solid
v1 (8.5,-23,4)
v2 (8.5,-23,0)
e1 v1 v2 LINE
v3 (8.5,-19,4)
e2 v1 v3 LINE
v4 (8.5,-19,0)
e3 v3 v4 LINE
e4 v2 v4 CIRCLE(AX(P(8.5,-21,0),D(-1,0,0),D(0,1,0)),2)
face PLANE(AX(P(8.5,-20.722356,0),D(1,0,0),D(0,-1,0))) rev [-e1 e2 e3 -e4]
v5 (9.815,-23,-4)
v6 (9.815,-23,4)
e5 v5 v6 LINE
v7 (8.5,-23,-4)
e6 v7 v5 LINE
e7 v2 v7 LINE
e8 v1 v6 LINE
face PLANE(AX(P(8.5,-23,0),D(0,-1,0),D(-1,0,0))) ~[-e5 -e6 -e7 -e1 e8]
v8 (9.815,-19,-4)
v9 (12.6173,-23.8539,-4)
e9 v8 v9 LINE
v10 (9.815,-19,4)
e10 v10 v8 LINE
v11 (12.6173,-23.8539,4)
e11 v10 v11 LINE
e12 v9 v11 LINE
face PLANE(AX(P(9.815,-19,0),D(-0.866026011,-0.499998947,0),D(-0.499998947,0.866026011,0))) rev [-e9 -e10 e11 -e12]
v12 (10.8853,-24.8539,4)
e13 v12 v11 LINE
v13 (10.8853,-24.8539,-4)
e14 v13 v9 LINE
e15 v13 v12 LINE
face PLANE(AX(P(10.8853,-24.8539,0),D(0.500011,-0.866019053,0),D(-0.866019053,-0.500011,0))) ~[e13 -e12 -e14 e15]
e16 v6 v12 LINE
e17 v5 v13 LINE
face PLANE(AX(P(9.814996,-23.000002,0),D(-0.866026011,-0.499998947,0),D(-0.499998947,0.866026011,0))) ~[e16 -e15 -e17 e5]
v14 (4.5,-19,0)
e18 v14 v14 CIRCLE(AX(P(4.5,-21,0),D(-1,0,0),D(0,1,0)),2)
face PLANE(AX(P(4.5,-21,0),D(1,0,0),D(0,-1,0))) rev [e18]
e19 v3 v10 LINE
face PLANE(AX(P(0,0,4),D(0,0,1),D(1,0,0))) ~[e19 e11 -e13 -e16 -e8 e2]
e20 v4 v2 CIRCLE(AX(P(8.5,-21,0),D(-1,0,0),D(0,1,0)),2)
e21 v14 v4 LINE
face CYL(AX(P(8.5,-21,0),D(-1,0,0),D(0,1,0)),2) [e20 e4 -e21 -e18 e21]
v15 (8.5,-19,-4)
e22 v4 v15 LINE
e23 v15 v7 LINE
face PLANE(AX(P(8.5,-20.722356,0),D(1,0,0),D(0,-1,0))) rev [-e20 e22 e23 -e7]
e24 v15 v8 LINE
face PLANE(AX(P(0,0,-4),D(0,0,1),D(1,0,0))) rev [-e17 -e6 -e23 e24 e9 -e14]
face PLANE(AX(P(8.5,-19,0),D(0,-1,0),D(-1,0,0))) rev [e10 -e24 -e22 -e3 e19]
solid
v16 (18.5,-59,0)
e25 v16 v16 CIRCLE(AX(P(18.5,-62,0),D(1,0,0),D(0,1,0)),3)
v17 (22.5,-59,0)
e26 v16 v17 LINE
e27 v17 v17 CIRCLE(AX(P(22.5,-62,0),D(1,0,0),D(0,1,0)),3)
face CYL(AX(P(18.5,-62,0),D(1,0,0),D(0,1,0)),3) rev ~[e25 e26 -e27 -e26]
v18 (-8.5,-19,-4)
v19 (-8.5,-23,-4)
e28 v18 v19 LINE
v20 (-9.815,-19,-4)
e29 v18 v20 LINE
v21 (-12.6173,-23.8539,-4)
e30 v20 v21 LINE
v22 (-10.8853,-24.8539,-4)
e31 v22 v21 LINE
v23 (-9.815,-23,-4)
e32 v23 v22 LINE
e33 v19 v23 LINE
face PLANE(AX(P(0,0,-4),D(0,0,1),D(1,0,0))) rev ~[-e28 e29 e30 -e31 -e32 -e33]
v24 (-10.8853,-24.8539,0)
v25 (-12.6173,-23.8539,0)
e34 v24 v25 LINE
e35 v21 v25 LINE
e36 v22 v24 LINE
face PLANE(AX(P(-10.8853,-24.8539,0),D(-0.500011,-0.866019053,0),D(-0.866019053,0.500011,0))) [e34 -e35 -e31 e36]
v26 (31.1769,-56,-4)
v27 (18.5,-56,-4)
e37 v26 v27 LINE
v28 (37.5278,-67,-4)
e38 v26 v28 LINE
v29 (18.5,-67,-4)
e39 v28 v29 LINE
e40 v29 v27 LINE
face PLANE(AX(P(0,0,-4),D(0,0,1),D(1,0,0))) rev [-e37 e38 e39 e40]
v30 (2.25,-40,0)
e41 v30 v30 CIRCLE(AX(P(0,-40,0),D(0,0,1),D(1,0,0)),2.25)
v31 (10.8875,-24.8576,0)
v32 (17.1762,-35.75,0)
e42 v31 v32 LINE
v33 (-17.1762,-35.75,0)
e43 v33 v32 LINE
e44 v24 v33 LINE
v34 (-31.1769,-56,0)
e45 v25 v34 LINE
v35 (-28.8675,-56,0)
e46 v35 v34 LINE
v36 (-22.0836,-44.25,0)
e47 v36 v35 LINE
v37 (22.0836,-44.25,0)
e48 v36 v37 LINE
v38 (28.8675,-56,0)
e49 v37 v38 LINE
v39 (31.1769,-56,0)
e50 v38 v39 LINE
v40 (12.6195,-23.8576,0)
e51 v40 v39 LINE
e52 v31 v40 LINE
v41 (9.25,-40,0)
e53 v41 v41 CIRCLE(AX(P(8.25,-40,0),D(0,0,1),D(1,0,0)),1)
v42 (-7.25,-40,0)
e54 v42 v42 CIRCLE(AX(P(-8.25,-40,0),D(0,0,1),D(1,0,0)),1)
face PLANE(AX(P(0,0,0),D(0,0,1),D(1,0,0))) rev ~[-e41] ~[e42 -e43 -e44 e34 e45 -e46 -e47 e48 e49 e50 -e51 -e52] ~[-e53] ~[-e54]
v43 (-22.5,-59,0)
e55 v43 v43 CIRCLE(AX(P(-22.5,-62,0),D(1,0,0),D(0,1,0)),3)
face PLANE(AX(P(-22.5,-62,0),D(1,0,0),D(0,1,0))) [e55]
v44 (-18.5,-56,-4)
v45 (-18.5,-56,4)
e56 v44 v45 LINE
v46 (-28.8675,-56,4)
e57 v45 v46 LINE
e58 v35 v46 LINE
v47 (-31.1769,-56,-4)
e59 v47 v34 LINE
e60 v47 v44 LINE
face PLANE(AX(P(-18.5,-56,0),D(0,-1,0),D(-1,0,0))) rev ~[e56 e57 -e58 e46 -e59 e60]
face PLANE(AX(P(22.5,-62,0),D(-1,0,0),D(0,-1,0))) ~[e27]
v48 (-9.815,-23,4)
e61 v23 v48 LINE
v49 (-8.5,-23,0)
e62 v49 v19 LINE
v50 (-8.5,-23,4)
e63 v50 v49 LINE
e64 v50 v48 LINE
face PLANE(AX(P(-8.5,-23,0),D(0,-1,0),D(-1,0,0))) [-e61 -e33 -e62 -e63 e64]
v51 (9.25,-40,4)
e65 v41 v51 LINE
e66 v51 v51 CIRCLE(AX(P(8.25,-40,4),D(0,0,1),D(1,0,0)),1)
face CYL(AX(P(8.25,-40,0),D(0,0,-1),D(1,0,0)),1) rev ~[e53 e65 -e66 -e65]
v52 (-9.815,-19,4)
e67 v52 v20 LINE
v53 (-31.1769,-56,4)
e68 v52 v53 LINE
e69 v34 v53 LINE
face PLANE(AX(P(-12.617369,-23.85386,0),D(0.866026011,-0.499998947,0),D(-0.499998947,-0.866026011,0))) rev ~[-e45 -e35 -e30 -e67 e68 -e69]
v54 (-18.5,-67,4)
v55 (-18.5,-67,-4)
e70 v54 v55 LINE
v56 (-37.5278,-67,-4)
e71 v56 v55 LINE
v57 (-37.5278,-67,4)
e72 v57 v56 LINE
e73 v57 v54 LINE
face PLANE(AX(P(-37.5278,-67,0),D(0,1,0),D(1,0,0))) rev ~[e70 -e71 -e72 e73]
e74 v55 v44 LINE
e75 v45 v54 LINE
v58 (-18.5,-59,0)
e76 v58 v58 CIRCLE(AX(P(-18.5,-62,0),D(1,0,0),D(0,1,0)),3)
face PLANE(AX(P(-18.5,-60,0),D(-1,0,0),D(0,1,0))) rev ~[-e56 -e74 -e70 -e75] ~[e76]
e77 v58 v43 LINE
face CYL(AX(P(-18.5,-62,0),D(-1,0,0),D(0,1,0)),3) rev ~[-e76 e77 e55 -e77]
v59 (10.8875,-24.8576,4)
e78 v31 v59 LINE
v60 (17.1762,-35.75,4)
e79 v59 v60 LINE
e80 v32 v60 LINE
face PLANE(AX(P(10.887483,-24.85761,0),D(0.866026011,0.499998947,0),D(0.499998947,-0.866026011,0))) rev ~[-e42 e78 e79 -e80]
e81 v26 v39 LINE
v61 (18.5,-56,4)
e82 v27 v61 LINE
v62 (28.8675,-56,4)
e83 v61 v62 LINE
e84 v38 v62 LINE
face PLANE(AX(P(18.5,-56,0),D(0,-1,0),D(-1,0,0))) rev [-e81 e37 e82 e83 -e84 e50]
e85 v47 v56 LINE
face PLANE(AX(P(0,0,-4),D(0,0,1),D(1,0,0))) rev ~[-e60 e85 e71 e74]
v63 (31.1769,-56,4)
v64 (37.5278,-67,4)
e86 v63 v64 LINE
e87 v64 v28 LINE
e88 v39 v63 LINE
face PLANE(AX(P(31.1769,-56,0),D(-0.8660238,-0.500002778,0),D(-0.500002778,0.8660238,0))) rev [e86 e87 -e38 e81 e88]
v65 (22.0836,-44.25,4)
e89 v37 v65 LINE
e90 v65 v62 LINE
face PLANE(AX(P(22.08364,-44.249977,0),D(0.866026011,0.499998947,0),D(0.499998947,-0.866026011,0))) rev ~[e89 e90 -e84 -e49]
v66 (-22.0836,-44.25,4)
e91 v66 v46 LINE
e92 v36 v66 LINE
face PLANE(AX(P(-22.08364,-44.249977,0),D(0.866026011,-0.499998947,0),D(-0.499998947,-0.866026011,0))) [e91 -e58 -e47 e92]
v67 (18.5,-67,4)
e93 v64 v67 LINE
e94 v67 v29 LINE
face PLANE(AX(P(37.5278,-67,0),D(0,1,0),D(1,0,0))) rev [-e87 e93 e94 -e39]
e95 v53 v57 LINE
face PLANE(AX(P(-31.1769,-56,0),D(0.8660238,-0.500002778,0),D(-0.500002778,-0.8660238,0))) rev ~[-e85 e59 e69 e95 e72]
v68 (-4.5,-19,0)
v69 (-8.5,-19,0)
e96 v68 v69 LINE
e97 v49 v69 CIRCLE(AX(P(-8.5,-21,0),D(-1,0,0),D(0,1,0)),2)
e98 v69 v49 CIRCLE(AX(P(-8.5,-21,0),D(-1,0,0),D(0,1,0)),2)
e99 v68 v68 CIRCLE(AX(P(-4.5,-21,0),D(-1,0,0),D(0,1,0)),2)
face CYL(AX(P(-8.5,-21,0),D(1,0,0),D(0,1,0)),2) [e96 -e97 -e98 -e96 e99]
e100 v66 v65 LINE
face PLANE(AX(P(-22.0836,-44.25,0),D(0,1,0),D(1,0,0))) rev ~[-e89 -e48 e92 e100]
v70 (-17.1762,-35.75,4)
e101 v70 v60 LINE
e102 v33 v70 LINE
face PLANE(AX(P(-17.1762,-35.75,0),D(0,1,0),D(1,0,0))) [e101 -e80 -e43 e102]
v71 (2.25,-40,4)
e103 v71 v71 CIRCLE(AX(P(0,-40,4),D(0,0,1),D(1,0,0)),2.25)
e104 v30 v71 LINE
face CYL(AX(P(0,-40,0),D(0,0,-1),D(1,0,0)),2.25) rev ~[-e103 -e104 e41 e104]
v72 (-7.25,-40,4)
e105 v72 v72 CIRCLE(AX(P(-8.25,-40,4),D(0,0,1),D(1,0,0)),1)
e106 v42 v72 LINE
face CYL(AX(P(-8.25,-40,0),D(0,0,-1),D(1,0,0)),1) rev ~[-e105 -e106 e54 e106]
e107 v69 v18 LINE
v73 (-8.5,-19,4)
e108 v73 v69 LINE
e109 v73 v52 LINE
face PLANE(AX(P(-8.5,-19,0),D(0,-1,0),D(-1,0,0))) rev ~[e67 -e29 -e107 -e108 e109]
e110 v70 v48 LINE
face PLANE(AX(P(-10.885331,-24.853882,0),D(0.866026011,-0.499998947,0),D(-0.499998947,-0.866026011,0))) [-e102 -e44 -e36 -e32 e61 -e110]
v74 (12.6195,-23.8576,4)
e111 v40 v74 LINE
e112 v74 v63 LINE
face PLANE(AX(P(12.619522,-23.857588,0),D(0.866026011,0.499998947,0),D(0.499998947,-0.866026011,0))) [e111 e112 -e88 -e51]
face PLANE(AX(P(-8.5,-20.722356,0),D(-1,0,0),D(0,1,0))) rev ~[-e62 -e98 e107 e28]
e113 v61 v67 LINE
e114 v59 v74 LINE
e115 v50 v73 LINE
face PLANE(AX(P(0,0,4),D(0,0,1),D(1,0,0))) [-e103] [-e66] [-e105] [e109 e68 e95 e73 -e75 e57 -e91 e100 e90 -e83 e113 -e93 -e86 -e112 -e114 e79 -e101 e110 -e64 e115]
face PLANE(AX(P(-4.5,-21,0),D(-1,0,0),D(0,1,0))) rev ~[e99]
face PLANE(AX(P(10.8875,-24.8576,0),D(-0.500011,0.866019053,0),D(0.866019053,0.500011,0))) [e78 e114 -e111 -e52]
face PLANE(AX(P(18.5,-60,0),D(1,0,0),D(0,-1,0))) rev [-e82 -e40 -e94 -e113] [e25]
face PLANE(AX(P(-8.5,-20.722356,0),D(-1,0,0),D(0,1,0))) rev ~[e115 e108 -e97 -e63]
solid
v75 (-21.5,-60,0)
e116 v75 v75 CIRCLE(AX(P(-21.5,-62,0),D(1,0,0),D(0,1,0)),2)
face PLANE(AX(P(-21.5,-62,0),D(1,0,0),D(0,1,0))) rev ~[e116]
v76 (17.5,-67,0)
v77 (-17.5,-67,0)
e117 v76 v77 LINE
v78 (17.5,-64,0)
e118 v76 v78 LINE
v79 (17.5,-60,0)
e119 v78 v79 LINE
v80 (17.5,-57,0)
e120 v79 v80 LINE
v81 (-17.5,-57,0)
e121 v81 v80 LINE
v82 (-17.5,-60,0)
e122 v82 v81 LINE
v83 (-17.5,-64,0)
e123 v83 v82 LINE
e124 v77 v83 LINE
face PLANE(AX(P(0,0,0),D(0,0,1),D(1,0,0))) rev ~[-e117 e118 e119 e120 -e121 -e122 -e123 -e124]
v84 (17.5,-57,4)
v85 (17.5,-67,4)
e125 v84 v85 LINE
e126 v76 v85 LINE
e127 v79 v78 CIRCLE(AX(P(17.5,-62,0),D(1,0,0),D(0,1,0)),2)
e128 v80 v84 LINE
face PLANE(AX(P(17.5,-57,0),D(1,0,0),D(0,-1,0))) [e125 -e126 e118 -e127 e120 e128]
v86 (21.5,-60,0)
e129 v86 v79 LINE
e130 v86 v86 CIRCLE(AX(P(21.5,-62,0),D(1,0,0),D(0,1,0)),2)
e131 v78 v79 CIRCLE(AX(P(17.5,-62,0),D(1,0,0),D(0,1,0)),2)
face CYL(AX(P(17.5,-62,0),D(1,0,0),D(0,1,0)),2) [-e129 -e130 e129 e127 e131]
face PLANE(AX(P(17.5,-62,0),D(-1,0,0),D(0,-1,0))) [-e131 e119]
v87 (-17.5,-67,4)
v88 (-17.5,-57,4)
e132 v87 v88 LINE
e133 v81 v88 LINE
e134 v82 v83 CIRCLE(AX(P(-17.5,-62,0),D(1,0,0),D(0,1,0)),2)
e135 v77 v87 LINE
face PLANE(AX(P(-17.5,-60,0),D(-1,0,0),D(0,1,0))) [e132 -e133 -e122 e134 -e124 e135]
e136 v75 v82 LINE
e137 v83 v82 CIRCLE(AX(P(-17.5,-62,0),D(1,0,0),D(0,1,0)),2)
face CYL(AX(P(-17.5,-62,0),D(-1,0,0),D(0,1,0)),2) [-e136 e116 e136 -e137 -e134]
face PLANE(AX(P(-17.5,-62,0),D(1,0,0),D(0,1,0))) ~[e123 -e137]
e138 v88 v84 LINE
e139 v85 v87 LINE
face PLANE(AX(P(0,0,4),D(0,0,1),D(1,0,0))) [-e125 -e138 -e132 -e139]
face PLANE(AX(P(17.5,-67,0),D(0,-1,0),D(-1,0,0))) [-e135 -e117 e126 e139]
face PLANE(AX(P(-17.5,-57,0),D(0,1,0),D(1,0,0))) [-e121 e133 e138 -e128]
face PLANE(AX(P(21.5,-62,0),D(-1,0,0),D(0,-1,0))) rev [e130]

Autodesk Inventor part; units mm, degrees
ref_plane "YZ Plane" through (0, 0, 0) normal (1, 0, 0) x (0, 1, 0)
ref_plane "XZ Plane" through (0, 0, 0) normal (0, 1, 0) x (-1, 0, 0)
ref_plane "XY Plane" through (0, 0, 0) normal (0, 0, 1) x (1, 0, 0)
sketch "Sketch1" plane through (0, 0, 0) normal (0, 0, 1) x (1, 0, 0)
  circle A0 centre (0, 0) radius 7.5
  line L0 (-21.2869, 0) -> (22.3896, 0) construction
  line L1 (0, 21.9302) -> (0, -69.0741) construction
  circle A1 centre (0, 11.75) radius 2.25
  circle A2 centre (-11.75, 0) radius 2.25
  circle A3 centre (0, -11.75) radius 2.25
  circle A4 centre (11.75, 0) radius 2.25
  line L2 (24.9778, -67) -> (-24.9778, -67) construction
  line L3 (-17.5, -57) -> (17.5, -57)
  line L4 (17.5, -57) -> (17.5, -67)
  line L5 (17.5, -67) -> (-17.5, -67)
  line L6 (-17.5, -67) -> (-17.5, -57)
  line L7 (-37.5278, -67) -> (-18.5, -67)
  line L8 (-18.5, -67) -> (-18.5, -56)
  line L9 (-17.5, -62) -> (17.5, -62) construction
  line L10 (-18.5, -59) -> (-22.5, -59)
  line L11 (-22.5, -59) -> (-22.5, -65)
  line L12 (-22.5, -65) -> (-18.5, -65)
  line L13 (-18.5, -65) -> (-18.5, -59)
  line L14 (-17.5, -60) -> (-21.5, -60)
  line L15 (-21.5, -60) -> (-21.5, -64)
  line L16 (-21.5, -64) -> (-17.5, -64)
  line L17 (-17.5, -64) -> (-17.5, -60)
  line L18 (-18.5, -56) -> (-28.8675, -56)
  line L19 (17.5, -60) -> (21.5, -60)
  line L20 (21.5, -60) -> (21.5, -64)
  line L21 (21.5, -64) -> (17.5, -64)
  line L22 (17.5, -64) -> (17.5, -60)
  line L23 (18.5, -67) -> (18.5, -56)
  line L24 (18.5, -67) -> (37.5278, -67)
  line L25 (18.5, -65) -> (22.5, -65)
  line L26 (22.5, -65) -> (22.5, -59)
  line L27 (22.5, -59) -> (18.5, -59)
  line L28 (18.5, -59) -> (18.5, -65)
  line L29 (18.5, -56) -> (28.8675, -56)
  line L30 (-23.7704, -40) -> (28.6931, -40) construction
  line L31 (-17.1762, -35.75) -> (17.1762, -35.75)
  line L32 (-22.0836, -44.25) -> (22.0836, -44.25)
  circle A5 centre (0, -40) radius 2.25
  line L33 (-7.5, -16) -> (7.5, -16)
  line L34 (7.5, -16) -> (7.5, -21)
  line L35 (7.5, -26) -> (-7.5, -26)
  line L36 (-7.5, -26) -> (-7.5, -24)
  line L37 (7.5, -21) -> (-7.5, -21) construction
  line L38 (-7.5, -18) -> (-3.5, -18)
  line L39 (-3.5, -18) -> (-3.5, -21)
  line L40 (-3.5, -24) -> (-7.5, -24)
  line L41 (-7.5, -24) -> (-7.5, -23)
  line L42 (-8.5, -19) -> (-4.5, -19)
  line L43 (-4.5, -19) -> (-4.5, -23)
  line L44 (-4.5, -23) -> (-8.5, -23)
  line L45 (-8.5, -23) -> (-8.5, -19)
  line L46 (7.5, -18) -> (3.5, -18)
  line L47 (3.5, -18) -> (3.5, -21)
  line L48 (3.5, -24) -> (7.5, -24)
  line L49 (7.5, -24) -> (7.5, -18)
  line L50 (8.5, -19) -> (4.5, -19)
  line L51 (4.5, -19) -> (4.5, -23)
  line L52 (4.5, -23) -> (8.5, -23)
  line L53 (8.5, -23) -> (8.5, -19)
  line L54 (-9.815, -19) -> (-31.1769, -56)
  line L55 (-7.5056, -19) -> (-28.8675, -56)
  line L56 (7.5056, -19) -> (28.8675, -56)
  line L57 (-4.5, -21) -> (-8.5, -21)
  line L58 (4.5, -21) -> (8.5, -21)
  line L59 (-21.5, -62) -> (-17.5, -62)
  line L60 (17.5, -62) -> (21.5, -62)
  line L61 (-22.5, -62) -> (-18.5, -62)
  line L62 (22.5, -62) -> (18.5, -62)
  line L63 (-7.5, -21) -> (-3.5, -21)
  line L64 (3.5, -21) -> (7.5, -21)
  line L65 (-28.8675, -56) -> (-31.1769, -56)
  line L66 (28.8675, -56) -> (31.1769, -56)
  line L67 (-10.8853, -24.8539) -> (-12.6173, -23.8539)
  line L68 (10.8875, -24.8576) -> (12.6195, -23.8576)
  line L69 (7.5, -23) -> (7.5, -24)
  line L70 (-7.5, -23) -> (-7.5, -21)
  line L71 (-7.5, -24) -> (-7.5, -16)
  line L72 (7.5, -24) -> (7.5, -26)
  line L73 (-7.5, -21) -> (-7.5, -18)
  line L74 (-3.5, -21) -> (-3.5, -24)
  line L75 (3.5, -21) -> (3.5, -24)
  line L76 (7.5, -21) -> (7.5, -23)
  line L77 (-18.4752, 0) -> (-9.2376, 16)
  line L78 (-9.2376, 16) -> (9.2376, 16)
  line L79 (9.2376, 16) -> (18.4752, 0)
  line L80 (18.4752, 0) -> (9.2376, -16)
  line L81 (9.2376, -16) -> (-9.2376, -16)
  line L82 (-9.2376, -16) -> (-18.4752, 0)
  line L83 (-77.3649, 0) -> (-38.6825, 67) construction
  line L84 (-38.6825, 67) -> (38.6825, 67) construction
  line L85 (38.6825, 67) -> (77.3649, 0) construction
  line L86 (77.3649, 0) -> (38.6825, -67) construction
  line L87 (38.6825, -67) -> (-38.6825, -67) construction
  line L88 (-38.6825, -67) -> (-77.3649, 0) construction
  line L89 (-9.2376, -16) -> (-38.6825, -67) construction
  line L90 (9.2376, -16) -> (38.6825, -67) construction
  line L91 (0, -16.7974) -> (0, -26) construction
  line L92 (9.815, -19) -> (31.1769, -56)
  line L93 (-8.5, -19) -> (-9.815, -19)
  line L94 (8.5, -19) -> (9.815, -19)
  line L95 (-8.5, -23) -> (-9.815, -23)
  line L96 (8.5, -23) -> (9.815, -23)
  line L97 (-31.1769, -56) -> (-37.5278, -67)
  line L98 (31.1769, -56) -> (37.5278, -67)
  circle A6 centre (-8.25, -40) radius 1
  circle A7 centre (8.25, -40) radius 1
  point P0 (0, -57)
  point P1 (0, -67)
  point P2 (0, -62)
  point P3 (0, -21)
  dimension "d0" = 15
  dimension "d2" = 4.5
  dimension "d9" = 360
  dimension "d16" = 10
  dimension "d20" = 6
  dimension "d21" = 4
  dimension "d22" = 4
  dimension "d23" = 1
  dimension "d24" = 1
  dimension "d25" = 35
  dimension "d27" = 3
  dimension "d28" = 4
  dimension "d29" = 1
  dimension "d30" = 6
  dimension "d31" = 4
  dimension "d32" = 1
  dimension "d34" = 3
  dimension "d35" = 27
  dimension "d39" = 4.5
  dimension "d41" = 2
  dimension "d42" = 2
  dimension "d43" = 2
  dimension "d44" = 10
  dimension "d45" = 4
  dimension "d46" = 6
  dimension "d48" = 4
  dimension "d49" = 1
  dimension "d50" = 4
  dimension "d52" = 6
  dimension "d53" = 4
  dimension "d54" = 4
  dimension "d55" = 1
  dimension "d56" = 4
  dimension "d57" = 15
  dimension "d60" = 2
  dimension "d81" = 16
  dimension "d82" = 2
  dimension "d83" = 67
  dimension "d84" = 1
  dimension "d86" = 2
  dimension "d87" = 1
  dimension "d88" = 5
  dimension "d89" = 3
  dimension "d90" = 3
  dimension "d112" = 2
  dimension "d113" = 2
  dimension "d115" = 5
  dimension "d116" = 5
extrude "Extrusion6" [suppressed]
extrude "Extrusion7" [suppressed]
extrude "Extrusion1" add sketch "Sketch1" along normal blind 4 separate body contours L65 L54 L67 L55 | L56 L68 L92 L66 | L55 L31 L56 L32
extrude "Extrusion3" add sketch "Sketch1" along normal blind 4 separate body contours L3 L4 L5 L6
extrude "Extrusion2" add sketch "Sketch1" along normal mid plane 8 contours L14 L15 L61 L11 L10 L8 | L8 L59 L15 L14 | L8 L16 L15 L59 | L10 L11 L12 L8 L7 L97 L65 L18 | L8 L12 L11 L61 L15 L16 | L54 L93 L45 L55 L67 | L55 L45 L95 bodies 1
revolve "Revolution1" cut sketch "Sketch1" angle 360 about axis through (-22.5, -62, 0) along (1, 0, 0) bodies 1 contours L14 L15 L61 L11 L10 L8 | L8 L59 L15 L14
revolve "Revolution2" add sketch "Sketch1" angle 360 about axis through (-21.5, -62, 0) along (1, 0, 0) bodies 2 contours L6 L59 L8 L14 | L8 L59 L15 L14
revolve "Revolution3" add sketch "Sketch1" angle 360 about axis through (-4.5, -21, 0) along (-1, 0, 0) separate body contours L42 L55 L45 | L55 L42 L71 L57 L45 | L42 L43 L57 L71
revolve "Revolution4" [suppressed]
mirror "Mirror1" about plane through (0, 0, 0) normal (1, 0, 0) of "Extrusion2", "Revolution1", "Revolution2", "Revolution3" bodies 1
mirror "Mirror3" [suppressed]
mirror "Mirror4" about plane through (0, 0, 0) normal (1, 0, 0) of "Revolution3" bodies 3
combine bodies "Combine1" operation type add bodies to combine 2 3 1
equation "\"d2\" = screw"
equation "\"d20\" = hinge_w"
equation "\"d21\" = hinge_d"
equation "\"d22\" = hinge_w - 2 * hinge_sp"
equation "\"d23\" = hinge_sp"
equation "\"d24\" = sp"
equation "\"d28\" = hinge_w - 2 * hinge_sp"
equation "\"d29\" = sp"
equation "\"d30\" = hinge_w"
equation "\"d31\" = hinge_d"
equation "\"d32\" = hinge_sp"
equation "\"d39\" = screw"
equation "\"d45\" = hinge_d"
equation "\"d46\" = hinge_w"
equation "\"d48\" = hinge_d"
equation "\"d49\" = hinge_sp"
equation "\"d50\" = hinge_w - 2 * hinge_sp"
equation "\"screw\" = 4.5"
equation "\"k\" = 0.4"
equation "\"sp\" = 1"
equation "\"d14\" = sp"
equation "\"d15\" = sp"
equation "\"d19\" = sp"
equation "\"hinge_d\" = 4"
equation "\"hinge_w\" = 6"
equation "\"hinge_sp\" = 1"
properties part number "RobotBase"
